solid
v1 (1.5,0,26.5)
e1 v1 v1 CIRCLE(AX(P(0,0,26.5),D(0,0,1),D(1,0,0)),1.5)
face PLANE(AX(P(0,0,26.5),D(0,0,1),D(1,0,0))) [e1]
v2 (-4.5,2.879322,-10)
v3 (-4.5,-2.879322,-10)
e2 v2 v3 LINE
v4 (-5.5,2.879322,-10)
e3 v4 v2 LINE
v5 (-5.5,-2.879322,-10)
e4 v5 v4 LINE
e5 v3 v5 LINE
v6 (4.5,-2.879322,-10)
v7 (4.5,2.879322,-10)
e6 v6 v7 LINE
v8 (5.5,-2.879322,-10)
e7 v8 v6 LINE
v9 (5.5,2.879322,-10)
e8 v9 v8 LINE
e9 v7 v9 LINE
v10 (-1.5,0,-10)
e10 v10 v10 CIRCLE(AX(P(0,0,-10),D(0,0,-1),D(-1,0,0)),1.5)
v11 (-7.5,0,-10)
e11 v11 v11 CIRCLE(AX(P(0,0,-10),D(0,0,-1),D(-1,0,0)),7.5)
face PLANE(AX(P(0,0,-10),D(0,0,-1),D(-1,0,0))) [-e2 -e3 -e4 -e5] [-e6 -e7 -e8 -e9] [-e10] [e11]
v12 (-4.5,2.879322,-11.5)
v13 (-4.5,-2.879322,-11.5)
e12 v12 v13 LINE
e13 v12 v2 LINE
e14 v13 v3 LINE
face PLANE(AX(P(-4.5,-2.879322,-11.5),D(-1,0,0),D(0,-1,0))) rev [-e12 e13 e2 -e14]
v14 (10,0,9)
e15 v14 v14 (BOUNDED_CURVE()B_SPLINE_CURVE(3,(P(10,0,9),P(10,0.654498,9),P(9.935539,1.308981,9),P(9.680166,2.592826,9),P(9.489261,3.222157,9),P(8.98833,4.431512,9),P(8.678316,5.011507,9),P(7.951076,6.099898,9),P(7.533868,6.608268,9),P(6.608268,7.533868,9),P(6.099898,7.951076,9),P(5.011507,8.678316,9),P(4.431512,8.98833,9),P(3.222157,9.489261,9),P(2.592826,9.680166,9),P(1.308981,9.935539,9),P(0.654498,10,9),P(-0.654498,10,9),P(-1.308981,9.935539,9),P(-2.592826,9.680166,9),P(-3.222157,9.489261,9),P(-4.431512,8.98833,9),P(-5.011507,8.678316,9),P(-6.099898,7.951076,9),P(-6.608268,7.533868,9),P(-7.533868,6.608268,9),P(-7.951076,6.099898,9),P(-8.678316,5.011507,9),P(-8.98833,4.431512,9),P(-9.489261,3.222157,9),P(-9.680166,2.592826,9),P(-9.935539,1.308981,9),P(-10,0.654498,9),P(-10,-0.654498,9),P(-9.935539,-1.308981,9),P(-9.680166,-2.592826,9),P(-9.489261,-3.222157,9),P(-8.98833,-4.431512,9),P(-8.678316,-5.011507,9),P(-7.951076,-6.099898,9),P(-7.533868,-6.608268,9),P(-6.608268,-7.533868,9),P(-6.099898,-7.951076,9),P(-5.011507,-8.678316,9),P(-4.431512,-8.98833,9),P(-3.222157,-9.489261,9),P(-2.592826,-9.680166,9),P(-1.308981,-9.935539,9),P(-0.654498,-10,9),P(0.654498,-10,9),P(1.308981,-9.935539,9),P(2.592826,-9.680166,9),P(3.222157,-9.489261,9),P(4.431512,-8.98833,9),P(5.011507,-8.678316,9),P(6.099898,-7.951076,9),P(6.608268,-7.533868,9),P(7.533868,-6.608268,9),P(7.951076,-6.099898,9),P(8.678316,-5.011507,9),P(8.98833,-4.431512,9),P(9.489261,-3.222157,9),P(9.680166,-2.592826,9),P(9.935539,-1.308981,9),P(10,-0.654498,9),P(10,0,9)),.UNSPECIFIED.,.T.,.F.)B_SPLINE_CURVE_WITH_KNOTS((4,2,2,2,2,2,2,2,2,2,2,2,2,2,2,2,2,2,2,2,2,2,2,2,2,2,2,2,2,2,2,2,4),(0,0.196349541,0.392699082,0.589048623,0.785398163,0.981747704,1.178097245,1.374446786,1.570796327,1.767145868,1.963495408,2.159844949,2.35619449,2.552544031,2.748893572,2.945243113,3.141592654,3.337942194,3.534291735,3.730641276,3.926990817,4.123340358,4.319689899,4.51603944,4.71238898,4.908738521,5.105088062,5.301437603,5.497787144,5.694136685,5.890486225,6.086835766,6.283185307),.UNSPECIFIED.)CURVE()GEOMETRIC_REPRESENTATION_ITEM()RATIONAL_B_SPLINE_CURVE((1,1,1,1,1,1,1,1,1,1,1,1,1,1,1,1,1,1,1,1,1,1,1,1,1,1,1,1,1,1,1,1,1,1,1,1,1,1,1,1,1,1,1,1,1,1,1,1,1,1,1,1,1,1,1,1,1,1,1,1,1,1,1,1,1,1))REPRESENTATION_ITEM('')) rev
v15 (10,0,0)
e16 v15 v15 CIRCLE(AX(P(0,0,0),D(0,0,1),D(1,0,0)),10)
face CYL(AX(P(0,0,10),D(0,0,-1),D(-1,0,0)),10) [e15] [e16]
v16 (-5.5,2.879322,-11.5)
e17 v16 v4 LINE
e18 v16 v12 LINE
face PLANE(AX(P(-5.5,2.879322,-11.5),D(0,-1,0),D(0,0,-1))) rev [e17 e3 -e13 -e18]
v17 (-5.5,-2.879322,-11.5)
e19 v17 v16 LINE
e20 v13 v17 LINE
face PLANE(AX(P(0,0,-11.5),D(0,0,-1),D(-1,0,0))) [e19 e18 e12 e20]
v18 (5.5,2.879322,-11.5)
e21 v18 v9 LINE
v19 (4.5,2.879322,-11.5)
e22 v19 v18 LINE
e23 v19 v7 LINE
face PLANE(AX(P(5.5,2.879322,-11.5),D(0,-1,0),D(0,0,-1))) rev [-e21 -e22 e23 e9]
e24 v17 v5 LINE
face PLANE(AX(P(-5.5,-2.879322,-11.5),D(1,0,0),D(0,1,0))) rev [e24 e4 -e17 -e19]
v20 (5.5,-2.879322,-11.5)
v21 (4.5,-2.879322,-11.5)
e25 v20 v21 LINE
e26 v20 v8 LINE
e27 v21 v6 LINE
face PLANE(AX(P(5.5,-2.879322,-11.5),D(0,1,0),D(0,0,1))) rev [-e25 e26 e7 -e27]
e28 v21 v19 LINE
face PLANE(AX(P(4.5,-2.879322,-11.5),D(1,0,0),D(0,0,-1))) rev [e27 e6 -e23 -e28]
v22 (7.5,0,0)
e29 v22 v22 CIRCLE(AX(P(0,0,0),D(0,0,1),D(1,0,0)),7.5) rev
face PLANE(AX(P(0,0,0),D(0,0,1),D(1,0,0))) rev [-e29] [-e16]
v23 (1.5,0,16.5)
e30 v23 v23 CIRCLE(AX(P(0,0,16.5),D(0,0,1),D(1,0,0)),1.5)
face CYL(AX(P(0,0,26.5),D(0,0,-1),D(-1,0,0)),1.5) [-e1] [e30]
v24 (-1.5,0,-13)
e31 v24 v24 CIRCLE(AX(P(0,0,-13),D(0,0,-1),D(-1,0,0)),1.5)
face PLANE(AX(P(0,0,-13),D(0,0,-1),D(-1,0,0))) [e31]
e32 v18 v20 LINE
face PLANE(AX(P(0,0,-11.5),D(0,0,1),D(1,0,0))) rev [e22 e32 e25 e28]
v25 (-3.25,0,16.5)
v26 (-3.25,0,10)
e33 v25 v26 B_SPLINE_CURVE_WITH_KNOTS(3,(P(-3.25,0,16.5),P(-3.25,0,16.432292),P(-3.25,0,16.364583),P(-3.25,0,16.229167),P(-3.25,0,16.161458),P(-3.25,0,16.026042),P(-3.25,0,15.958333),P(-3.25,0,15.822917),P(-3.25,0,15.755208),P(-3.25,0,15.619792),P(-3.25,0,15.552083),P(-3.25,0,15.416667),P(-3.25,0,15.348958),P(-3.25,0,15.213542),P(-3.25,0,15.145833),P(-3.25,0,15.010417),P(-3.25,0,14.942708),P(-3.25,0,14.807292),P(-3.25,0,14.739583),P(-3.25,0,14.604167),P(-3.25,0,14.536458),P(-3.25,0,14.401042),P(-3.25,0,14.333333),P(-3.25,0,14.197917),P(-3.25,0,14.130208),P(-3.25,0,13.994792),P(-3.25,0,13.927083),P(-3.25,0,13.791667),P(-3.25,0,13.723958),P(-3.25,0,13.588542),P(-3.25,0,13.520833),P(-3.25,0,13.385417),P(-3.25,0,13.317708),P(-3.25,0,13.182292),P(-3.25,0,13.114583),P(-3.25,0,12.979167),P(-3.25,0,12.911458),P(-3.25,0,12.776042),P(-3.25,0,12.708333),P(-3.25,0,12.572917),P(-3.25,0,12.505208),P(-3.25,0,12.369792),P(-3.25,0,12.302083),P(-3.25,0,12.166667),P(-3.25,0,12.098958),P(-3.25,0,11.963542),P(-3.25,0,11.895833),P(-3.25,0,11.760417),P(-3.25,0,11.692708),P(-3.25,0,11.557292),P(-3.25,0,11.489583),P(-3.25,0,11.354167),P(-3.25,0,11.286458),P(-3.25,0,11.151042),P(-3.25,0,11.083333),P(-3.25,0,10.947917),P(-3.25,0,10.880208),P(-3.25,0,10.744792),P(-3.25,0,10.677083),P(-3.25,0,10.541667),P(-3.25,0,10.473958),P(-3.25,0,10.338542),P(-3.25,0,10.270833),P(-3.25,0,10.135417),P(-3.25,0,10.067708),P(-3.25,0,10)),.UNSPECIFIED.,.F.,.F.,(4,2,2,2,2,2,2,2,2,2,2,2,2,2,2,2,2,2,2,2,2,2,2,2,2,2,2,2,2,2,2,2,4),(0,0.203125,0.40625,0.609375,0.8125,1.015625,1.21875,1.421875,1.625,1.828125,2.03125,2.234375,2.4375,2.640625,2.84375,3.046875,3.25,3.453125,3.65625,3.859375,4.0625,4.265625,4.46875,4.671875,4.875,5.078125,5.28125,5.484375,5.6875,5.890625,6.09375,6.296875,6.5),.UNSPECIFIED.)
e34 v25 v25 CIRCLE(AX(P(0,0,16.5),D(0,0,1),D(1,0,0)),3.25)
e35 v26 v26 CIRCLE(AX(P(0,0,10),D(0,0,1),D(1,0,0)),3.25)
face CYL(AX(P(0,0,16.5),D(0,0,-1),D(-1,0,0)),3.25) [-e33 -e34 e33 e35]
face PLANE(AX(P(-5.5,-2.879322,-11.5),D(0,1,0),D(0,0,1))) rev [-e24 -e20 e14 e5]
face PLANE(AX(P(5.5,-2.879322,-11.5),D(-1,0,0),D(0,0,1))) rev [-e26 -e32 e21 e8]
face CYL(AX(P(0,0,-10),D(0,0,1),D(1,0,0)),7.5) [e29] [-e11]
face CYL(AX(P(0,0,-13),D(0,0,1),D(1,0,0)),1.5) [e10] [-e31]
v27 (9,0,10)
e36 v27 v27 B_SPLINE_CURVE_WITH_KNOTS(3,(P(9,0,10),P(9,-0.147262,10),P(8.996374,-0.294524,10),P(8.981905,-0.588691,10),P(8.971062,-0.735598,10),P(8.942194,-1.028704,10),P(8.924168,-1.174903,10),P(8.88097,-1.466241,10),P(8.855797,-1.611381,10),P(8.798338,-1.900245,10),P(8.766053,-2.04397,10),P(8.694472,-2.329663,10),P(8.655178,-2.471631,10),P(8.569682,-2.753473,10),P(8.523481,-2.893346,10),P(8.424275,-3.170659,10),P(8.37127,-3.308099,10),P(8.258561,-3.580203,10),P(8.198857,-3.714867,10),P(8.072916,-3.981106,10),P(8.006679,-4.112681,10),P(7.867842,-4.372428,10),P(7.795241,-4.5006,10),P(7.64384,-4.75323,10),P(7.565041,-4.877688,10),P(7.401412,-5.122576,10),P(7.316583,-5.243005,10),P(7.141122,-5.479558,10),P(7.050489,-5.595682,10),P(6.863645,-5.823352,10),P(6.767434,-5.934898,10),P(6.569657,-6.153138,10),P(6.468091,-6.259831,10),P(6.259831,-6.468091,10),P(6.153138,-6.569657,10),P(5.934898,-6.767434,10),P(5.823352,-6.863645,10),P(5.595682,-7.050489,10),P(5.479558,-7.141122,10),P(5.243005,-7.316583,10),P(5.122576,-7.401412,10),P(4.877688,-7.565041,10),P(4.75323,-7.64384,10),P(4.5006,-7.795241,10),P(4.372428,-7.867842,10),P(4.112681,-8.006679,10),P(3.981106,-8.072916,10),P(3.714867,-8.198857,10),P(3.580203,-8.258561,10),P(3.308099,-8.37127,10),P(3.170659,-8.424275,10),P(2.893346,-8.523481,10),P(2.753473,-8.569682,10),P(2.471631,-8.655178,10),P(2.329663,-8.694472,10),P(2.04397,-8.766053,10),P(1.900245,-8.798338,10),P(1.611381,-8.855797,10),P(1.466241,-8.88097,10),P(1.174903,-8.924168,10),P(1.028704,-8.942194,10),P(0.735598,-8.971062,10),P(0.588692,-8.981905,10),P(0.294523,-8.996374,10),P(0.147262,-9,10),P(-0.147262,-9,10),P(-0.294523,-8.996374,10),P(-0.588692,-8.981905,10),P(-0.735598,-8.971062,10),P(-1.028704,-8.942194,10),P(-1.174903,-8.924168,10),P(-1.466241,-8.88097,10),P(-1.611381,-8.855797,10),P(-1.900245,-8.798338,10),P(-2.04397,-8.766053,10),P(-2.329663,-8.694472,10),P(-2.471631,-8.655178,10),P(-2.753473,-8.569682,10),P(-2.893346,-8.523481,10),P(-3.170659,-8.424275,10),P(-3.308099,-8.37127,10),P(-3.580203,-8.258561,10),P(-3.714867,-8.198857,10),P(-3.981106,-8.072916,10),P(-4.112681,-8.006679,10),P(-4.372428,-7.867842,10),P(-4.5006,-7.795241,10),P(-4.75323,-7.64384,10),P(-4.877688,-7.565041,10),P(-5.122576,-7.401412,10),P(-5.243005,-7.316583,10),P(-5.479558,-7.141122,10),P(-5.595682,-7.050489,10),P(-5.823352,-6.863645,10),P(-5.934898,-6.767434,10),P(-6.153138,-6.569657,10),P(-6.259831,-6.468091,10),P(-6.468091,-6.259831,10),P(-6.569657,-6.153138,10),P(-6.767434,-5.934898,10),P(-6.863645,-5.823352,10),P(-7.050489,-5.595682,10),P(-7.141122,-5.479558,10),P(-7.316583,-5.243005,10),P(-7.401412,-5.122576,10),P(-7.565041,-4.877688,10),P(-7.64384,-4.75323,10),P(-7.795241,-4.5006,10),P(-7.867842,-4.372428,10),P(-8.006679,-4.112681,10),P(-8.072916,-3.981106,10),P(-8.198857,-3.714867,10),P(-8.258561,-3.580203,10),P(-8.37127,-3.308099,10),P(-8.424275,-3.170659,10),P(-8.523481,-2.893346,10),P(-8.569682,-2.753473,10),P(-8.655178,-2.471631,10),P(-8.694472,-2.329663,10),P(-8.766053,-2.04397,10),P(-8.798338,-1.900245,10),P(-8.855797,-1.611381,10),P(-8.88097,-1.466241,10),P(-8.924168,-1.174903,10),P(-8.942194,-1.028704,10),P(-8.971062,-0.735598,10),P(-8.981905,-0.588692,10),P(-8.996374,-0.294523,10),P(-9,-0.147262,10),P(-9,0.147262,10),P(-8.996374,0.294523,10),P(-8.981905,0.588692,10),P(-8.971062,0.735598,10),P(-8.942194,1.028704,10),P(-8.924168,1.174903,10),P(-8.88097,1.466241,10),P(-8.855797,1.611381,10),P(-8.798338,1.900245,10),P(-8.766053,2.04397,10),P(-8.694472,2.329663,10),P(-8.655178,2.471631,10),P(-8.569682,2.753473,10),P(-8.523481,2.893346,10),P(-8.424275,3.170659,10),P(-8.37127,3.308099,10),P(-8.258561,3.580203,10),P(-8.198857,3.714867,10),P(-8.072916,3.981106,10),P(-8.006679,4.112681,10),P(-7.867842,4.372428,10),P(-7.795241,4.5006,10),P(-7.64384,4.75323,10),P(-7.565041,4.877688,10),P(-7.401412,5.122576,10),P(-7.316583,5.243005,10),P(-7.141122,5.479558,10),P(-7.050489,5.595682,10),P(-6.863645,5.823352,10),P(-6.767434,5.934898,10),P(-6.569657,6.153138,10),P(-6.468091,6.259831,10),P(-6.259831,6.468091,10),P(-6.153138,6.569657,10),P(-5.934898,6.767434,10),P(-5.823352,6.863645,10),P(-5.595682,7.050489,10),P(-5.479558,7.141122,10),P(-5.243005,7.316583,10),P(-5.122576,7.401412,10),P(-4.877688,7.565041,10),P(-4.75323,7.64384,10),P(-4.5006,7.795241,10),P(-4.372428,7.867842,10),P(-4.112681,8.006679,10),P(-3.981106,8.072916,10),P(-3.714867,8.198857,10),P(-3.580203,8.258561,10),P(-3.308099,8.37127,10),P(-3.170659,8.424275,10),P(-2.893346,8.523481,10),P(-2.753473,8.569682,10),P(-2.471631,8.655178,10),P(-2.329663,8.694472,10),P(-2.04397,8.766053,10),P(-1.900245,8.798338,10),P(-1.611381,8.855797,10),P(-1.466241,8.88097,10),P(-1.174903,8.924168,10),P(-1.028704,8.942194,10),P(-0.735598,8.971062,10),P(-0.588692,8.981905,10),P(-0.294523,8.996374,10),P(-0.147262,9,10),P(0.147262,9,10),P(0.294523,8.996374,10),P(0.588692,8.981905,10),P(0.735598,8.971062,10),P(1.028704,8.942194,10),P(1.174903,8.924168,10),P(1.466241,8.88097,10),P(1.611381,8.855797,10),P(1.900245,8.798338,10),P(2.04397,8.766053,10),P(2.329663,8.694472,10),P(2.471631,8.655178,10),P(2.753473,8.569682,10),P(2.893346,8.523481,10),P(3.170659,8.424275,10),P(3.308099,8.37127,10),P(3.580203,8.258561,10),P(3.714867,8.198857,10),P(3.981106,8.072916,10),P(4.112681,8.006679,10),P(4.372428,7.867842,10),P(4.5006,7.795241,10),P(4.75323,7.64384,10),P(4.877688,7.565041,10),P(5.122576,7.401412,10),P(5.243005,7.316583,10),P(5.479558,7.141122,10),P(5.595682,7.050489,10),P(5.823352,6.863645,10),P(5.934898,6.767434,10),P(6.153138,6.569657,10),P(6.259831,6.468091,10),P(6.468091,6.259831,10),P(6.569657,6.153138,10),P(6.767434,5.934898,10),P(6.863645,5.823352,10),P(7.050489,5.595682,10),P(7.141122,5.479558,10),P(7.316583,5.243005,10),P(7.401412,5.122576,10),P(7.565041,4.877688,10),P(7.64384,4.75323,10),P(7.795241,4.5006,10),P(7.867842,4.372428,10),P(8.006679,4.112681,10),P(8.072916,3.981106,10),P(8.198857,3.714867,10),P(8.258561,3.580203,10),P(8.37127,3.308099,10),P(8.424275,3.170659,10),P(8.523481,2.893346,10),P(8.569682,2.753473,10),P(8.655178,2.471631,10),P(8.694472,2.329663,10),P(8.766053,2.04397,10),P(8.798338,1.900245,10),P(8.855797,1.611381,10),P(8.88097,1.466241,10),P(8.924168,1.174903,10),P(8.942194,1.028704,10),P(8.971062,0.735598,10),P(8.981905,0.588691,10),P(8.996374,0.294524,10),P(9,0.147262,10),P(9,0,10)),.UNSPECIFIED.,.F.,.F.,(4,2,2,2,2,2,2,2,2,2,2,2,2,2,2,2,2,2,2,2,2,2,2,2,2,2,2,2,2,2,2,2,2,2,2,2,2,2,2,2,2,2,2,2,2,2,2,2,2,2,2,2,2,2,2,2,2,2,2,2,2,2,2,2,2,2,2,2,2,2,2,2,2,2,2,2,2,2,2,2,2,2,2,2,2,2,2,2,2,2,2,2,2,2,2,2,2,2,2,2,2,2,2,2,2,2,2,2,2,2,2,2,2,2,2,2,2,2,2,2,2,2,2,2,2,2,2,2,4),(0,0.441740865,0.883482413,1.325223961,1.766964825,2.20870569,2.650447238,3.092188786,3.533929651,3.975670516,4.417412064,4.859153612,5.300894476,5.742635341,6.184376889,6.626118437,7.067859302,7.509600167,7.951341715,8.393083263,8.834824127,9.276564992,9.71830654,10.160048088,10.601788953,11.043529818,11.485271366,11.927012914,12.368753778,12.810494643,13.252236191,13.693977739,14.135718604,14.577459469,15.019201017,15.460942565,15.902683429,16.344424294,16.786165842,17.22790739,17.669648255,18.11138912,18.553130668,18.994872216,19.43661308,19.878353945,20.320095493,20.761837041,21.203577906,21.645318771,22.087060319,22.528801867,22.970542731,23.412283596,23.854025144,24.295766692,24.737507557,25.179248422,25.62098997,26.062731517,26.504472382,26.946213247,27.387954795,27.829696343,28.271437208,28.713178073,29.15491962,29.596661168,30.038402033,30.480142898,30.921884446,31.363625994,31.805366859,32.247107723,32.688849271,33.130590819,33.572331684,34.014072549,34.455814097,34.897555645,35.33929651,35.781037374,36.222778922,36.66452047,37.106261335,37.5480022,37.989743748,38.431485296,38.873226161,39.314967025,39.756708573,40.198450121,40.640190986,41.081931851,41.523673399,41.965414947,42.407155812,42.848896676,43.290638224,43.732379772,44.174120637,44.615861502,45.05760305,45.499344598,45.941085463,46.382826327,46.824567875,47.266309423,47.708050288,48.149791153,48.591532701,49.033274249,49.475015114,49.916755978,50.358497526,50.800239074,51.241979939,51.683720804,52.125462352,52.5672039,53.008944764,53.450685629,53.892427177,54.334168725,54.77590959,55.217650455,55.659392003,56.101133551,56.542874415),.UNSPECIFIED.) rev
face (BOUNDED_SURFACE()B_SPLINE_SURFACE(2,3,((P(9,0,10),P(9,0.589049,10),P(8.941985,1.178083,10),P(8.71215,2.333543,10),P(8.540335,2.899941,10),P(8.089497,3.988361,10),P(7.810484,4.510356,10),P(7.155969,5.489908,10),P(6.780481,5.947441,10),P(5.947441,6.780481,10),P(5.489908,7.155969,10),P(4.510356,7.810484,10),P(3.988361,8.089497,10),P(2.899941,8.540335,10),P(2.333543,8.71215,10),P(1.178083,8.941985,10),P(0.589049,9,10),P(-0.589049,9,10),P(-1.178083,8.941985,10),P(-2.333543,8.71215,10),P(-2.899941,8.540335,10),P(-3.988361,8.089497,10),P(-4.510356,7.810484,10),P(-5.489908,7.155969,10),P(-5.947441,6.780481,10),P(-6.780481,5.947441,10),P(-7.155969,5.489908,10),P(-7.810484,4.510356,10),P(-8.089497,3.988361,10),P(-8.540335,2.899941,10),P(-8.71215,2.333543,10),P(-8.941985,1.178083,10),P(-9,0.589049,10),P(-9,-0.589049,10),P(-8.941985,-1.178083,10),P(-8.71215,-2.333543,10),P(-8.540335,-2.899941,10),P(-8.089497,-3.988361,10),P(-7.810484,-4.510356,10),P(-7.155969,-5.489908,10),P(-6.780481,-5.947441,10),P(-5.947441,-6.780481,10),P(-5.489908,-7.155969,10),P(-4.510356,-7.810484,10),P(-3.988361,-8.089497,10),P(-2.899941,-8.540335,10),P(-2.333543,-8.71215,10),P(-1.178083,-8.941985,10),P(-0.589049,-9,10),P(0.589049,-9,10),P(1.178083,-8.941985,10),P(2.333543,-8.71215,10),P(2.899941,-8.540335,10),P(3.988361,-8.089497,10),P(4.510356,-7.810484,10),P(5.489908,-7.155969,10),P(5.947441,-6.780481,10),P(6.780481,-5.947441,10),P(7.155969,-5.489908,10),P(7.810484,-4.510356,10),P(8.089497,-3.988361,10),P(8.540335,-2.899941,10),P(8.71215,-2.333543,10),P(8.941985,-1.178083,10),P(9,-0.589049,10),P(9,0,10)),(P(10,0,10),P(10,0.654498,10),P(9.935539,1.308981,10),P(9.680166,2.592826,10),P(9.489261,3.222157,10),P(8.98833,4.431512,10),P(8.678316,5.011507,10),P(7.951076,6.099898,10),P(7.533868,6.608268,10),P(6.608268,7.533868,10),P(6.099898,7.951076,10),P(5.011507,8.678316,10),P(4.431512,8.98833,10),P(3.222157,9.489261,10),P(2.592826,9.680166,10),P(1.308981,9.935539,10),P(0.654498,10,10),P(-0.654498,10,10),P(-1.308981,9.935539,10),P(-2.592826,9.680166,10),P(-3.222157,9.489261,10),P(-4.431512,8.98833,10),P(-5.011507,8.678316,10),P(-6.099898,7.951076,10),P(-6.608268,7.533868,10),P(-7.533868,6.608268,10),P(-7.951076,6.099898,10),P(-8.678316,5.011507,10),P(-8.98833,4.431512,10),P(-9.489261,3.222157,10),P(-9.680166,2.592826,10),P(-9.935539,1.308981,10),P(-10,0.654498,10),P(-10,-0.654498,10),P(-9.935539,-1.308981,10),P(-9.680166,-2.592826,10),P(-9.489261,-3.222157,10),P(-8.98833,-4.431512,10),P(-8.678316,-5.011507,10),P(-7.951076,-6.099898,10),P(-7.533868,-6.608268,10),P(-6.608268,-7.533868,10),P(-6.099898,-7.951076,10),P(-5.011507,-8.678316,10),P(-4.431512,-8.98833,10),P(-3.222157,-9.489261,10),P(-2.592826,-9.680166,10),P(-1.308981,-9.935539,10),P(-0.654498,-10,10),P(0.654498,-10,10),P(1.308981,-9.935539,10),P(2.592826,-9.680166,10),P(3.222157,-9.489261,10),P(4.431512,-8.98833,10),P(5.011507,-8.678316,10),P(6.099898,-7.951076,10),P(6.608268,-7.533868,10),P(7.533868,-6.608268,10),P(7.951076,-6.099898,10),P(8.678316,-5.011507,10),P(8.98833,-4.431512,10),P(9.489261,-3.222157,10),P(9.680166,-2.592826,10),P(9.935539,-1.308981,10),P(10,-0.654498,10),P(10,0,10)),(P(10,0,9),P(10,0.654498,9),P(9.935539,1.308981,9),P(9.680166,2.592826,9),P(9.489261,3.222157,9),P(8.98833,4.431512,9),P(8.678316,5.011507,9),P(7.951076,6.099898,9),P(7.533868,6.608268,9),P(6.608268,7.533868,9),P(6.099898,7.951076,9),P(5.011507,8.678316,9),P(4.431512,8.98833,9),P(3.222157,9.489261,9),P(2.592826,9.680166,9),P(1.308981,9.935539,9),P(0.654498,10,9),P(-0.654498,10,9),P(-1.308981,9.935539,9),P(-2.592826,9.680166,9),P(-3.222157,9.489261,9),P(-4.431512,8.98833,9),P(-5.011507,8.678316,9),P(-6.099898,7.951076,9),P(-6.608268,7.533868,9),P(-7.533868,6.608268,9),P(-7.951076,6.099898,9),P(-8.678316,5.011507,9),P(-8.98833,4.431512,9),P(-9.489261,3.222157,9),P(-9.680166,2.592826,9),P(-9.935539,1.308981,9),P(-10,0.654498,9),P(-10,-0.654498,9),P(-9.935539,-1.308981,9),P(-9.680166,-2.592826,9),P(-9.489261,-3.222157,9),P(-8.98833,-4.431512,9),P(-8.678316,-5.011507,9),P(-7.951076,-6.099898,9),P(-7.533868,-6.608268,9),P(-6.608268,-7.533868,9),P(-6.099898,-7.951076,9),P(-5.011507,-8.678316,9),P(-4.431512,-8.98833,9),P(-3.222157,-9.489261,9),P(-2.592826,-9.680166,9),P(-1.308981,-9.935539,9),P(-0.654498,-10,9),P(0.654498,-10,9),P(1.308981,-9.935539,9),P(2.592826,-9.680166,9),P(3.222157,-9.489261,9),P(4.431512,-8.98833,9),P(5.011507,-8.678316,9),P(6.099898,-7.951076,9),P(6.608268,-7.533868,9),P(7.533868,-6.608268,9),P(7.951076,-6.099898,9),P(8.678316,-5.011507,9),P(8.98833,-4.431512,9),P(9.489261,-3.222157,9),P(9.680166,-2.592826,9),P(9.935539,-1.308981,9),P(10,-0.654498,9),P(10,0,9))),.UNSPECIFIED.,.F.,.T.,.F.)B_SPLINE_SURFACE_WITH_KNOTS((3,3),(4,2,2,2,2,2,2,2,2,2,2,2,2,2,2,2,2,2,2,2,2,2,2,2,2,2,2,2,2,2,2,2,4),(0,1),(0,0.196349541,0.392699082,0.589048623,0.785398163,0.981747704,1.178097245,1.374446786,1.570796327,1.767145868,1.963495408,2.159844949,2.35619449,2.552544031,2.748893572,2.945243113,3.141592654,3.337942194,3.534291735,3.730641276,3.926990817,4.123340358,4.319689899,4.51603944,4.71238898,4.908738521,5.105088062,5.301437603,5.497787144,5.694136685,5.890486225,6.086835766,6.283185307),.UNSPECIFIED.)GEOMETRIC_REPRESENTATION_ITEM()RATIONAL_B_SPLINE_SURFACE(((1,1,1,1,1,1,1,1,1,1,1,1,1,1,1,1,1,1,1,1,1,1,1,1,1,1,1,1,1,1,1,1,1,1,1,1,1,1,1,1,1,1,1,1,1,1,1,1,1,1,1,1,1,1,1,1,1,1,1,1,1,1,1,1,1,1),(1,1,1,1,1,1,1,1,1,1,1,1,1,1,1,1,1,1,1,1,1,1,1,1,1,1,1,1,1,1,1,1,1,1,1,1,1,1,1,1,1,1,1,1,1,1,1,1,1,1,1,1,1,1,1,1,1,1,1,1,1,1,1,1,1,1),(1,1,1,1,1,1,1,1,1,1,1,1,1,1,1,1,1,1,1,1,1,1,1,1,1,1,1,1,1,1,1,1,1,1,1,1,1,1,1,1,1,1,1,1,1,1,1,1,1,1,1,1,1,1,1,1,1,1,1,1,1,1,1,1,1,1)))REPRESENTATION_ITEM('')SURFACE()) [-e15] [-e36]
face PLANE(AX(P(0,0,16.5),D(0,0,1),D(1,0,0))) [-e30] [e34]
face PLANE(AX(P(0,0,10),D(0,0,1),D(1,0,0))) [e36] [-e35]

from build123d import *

# Parameters (mm, degrees)
SKETCH1_R           = 10
BOSS_EXTRUDE1_DEPTH = 10
SKETCH2_R           = 7.5
BOSS_EXTRUDE2_DEPTH = 10
SKETCH3_R           = 1.5
BOSS_EXTRUDE5_DEPTH = 3
SKETCH7_W           = 1
SKETCH7_H           = 5.758644492
BOSS_EXTRUDE7_DEPTH = 1.5
SKETCH8_R           = 3.25
BOSS_EXTRUDE8_DEPTH = 6.5
BOSS_EXTRUDE9_START = 10
SKETCH9_R           = 1.5
BOSS_EXTRUDE9_DEPTH = 10
FILLET2_SIZE        = 1


with BuildPart() as part:
    # Sketch1 → Boss-Extrude1 (new body)
    with BuildSketch(Plane.XY):
        Circle(SKETCH1_R)
    extrude(amount=BOSS_EXTRUDE1_DEPTH)

    # Sketch2 → Boss-Extrude2 (add)
    with BuildSketch(Plane(origin=(0, 0, 0), x_dir=(-1, 0, 0), z_dir=(0, 0, -1))):
        with Locations(Location((0, 0, 0), (0, 0, 180))):
            Circle(SKETCH2_R)
    extrude(amount=BOSS_EXTRUDE2_DEPTH)

    # Sketch3 → Boss-Extrude5 (add)
    with BuildSketch(Plane(origin=(0, 0, -10), x_dir=(-1, 0, 0), z_dir=(0, 0, -1))):
        Circle(SKETCH3_R)
    extrude(amount=BOSS_EXTRUDE5_DEPTH)

    # Sketch7 → Boss-Extrude7 (add)
    with BuildSketch(Plane(origin=(0, 0, -10), x_dir=(-1, 0, 0), z_dir=(0, 0, -1))):
        with Locations((-5, 0)):
            Rectangle(SKETCH7_W, SKETCH7_H)
        with Locations((5, 0)):
            Rectangle(SKETCH7_W, SKETCH7_H)
    extrude(amount=BOSS_EXTRUDE7_DEPTH)

    # Sketch8 → Boss-Extrude8 (add)
    with BuildSketch(Plane.XY.offset(10)):
        with Locations(Location((0, 0, 0), (0, 0, 180))):
            Circle(SKETCH8_R)
    extrude(amount=BOSS_EXTRUDE8_DEPTH)

    # Sketch9 → Boss-Extrude9 (add)
    with BuildSketch(Plane.XY.offset(16.5).offset(BOSS_EXTRUDE9_START)):
        with Locations(Location((0, 0, 0), (0, 0, 180))):
            Circle(SKETCH9_R)
    extrude(amount=-BOSS_EXTRUDE9_DEPTH)

    # Fillet2
    # a fillet whose section is not a circle: 1 mm, written as the material it takes off along each edge
    with BuildSketch(Plane(origin=(0, 0, 10), x_dir=(1, 0, 0), z_dir=(0, -1, 0))) as fillet2_piece_1:
        with BuildLine():
            Bezier((10, -FILLET2_SIZE), (10, 0), (10 - FILLET2_SIZE, 0), weights=[1, 1, 1])
            Line((10 - FILLET2_SIZE, 0), (10, 0))
            Line((10, 0), (10, -FILLET2_SIZE))
        make_face()
    revolve(axis=Axis((0, 0, 10), (0, 0, 1)), mode=Mode.SUBTRACT)


solid = part.part
